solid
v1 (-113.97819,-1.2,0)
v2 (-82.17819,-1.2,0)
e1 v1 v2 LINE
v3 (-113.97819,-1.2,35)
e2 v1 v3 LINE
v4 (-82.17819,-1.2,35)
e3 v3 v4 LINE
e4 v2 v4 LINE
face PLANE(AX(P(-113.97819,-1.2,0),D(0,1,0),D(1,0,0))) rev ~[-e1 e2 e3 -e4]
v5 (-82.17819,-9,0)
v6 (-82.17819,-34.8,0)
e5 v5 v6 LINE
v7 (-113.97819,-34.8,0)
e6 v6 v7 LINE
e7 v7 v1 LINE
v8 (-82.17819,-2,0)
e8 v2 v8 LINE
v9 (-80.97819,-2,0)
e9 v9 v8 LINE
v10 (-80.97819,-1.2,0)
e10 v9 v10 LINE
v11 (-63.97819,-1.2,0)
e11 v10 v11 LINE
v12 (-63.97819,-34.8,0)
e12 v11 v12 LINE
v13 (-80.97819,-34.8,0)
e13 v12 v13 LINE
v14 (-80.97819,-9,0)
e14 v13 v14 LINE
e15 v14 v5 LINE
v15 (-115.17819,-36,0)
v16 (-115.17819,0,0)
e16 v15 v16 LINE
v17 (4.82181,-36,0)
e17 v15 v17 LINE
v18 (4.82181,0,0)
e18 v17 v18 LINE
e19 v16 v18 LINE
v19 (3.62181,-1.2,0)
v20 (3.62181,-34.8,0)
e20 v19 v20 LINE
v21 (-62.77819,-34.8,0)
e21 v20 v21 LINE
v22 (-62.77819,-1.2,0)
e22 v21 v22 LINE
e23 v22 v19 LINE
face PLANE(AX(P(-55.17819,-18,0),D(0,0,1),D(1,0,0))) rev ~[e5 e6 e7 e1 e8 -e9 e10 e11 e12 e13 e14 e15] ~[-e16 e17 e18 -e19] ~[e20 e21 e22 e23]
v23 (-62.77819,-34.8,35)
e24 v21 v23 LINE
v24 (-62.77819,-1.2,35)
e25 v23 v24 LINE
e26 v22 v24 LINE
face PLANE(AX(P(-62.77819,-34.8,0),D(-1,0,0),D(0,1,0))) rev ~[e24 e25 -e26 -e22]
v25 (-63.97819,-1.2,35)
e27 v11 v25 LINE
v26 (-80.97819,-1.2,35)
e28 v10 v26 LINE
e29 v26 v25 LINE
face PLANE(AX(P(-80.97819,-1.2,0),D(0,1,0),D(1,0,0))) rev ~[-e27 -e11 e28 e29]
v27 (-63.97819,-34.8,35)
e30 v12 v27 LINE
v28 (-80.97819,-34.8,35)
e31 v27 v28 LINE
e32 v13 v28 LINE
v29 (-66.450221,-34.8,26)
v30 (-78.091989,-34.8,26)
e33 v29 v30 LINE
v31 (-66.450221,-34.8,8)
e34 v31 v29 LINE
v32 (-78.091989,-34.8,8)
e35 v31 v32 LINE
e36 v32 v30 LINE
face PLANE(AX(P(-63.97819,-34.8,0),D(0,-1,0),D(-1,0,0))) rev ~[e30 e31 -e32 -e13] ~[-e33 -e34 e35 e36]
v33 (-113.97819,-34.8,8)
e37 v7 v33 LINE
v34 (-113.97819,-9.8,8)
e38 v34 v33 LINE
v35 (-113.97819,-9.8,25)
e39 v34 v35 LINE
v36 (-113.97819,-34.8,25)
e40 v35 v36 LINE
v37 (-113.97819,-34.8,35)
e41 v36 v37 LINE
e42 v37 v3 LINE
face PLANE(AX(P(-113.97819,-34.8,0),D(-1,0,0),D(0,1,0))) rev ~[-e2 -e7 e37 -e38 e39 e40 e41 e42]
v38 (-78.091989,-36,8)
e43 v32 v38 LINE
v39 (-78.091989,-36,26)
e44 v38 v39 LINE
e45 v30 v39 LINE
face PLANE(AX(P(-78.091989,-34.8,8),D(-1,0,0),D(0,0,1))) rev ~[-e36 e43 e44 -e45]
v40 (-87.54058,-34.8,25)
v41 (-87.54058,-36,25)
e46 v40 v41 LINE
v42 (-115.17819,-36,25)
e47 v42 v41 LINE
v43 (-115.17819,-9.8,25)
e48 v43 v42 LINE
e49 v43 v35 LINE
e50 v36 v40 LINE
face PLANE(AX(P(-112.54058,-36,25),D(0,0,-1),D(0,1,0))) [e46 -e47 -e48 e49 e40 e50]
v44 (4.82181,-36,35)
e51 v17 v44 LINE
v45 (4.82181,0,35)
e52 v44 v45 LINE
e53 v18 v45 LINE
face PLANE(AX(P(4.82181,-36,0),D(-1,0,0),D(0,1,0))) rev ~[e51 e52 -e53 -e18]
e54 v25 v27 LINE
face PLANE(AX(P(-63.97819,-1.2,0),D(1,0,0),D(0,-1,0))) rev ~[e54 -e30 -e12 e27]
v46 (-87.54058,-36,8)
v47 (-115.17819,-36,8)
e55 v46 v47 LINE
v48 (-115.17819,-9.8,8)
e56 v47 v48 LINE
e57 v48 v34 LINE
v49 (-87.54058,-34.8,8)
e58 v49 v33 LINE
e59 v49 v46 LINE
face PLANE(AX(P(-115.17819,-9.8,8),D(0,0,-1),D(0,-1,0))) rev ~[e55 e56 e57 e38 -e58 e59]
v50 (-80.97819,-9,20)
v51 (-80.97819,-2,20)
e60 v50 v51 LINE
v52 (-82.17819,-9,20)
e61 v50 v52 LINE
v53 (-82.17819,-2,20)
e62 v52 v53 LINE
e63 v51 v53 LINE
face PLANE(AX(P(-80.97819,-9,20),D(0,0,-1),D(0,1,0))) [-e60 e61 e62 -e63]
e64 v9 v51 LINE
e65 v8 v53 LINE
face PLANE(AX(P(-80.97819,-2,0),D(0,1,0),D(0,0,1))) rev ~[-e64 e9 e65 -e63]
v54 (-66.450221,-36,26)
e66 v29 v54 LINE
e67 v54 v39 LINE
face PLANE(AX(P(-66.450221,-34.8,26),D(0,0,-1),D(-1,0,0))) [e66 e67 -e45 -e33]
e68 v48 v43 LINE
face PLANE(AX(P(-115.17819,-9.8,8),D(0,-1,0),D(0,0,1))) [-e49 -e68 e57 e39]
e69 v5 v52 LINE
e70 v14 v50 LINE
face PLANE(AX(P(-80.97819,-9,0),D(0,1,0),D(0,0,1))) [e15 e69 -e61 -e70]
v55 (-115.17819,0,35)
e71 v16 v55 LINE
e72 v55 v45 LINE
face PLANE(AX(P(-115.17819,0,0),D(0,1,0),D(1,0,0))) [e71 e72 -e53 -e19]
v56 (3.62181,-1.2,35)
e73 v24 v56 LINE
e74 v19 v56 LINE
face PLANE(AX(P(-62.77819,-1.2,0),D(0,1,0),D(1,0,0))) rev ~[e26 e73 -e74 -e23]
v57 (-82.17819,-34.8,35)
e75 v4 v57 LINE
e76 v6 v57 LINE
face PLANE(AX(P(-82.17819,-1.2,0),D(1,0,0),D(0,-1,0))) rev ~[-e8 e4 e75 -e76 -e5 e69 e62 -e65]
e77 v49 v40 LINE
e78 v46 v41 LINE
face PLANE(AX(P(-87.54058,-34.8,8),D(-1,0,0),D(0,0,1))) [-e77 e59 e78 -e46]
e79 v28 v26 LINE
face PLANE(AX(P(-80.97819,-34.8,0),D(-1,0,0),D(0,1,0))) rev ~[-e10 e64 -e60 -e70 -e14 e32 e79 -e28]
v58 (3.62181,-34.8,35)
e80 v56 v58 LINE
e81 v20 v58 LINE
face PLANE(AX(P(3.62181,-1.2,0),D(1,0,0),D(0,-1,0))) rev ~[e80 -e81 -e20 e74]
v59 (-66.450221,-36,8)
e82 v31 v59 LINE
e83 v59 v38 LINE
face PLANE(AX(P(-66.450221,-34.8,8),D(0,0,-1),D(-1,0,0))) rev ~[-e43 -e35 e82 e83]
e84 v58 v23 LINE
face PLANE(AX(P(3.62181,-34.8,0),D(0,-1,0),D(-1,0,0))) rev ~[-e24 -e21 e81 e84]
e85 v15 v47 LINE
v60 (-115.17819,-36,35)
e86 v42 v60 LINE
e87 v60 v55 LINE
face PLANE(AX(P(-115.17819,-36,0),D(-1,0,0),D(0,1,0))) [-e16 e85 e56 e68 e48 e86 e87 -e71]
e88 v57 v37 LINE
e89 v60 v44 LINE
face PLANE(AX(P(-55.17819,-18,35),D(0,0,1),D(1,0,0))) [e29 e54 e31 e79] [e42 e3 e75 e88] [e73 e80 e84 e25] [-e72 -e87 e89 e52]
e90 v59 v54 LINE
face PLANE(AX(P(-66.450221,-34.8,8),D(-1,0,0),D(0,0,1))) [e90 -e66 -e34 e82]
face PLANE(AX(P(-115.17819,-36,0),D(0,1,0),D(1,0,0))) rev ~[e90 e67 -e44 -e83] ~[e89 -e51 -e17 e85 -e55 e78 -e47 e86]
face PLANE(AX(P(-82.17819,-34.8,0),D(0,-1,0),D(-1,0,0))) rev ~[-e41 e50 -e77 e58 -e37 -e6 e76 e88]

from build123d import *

# Parameters (mm, degrees)
F0_W      = 120
F0_H      = 36
F1_DEPTH  = 35
F2_W      = 7
F2_H      = 20
F3_DEPTH  = 1.2
F4_W      = 11.6417678248
F4_H      = 18
F5_DEPTH  = 1.201
F6_W      = 25
F6_H      = 17
F7_DEPTH  = 1.2
F8_W      = 1.2
F8_H      = 17
F9_DEPTH  = 3
F10_W     = 25
F10_H     = 17
F11_DEPTH = 1.2


with BuildPart() as f1:
    # F0 (on Top) → F1 (new body)
    with BuildSketch(Plane.XY):
        with Locations((-55.1781901717, -18)):
            Rectangle(F0_W, F0_H)
        Polygon((-113.9781901717, -34.8), (-113.9781901717, -1.2), (-107.9781901717, -1.2), (-89.9781901717, -1.2), (-82.1781901717, -1.2), (-80.9781901717, -1.2), (-63.9781901717, -1.2), (-62.7781901717, -1.2), (-49.0207746625, -1.2), (-45.235440135, -1.2), (3.6218098283, -1.2), (3.6218098283, -34.8), (-62.7781901717, -34.8), (-63.9781901717, -34.8), (-80.9781901717, -34.8), (-82.1781901717, -34.8), align=None, mode=Mode.SUBTRACT)
        Polygon((-82.1781901717, -26.7), (-82.1781901717, -34.8), (-80.9781901717, -34.8), (-80.9781901717, -26.6408454627), (-80.9781901717, -8.1258974969), (-80.9781901717, -1.2), (-82.1781901717, -1.2), (-82.1781901717, -8.7), align=None)
        Polygon((-63.9781901717, -26.6408454627), (-63.9781901717, -34.8), (-62.7781901717, -34.8), (-62.7781901717, -1.2), (-63.9781901717, -1.2), (-63.9781901717, -8.1258974969), align=None)
    extrude(amount=F1_DEPTH)

    # F2 (on face) → F3 (cut)
    with BuildSketch(Plane.YZ.offset(-80.9781901717)):
        with Locations((-5.5, 10)):
            Rectangle(F2_W, F2_H)
    extrude(amount=-F3_DEPTH, mode=Mode.SUBTRACT)

    # F4 (on face) → F5 (cut, through all)
    with BuildSketch(Plane(origin=(0, -34.8, 0), x_dir=(-1, 0, 0), z_dir=(0, 1, 0))):
        with Locations((72.271104902, 17)):
            Rectangle(F4_W, F4_H)
    extrude(amount=-F5_DEPTH, mode=Mode.SUBTRACT)

    # F6 (on face) → F7 (cut)
    with BuildSketch(Plane(origin=(0, -34.8, 0), x_dir=(-1, 0, 0), z_dir=(0, 1, 0))):
        with Locations((100.0405803323, 16.5)):
            Rectangle(F6_W, F6_H)
    extrude(amount=-F7_DEPTH, mode=Mode.SUBTRACT)

    # F8 (on face) → F9 (cut)
    with BuildSketch(Plane.YZ.offset(-112.5405803323)):
        with Locations((-35.4, 16.5)):
            Rectangle(F8_W, F8_H)
    extrude(amount=-F9_DEPTH, mode=Mode.SUBTRACT)

    # F10 (on face) → F11 (cut)
    with BuildSketch(Plane(origin=(-115.1781901717, 0, 0), x_dir=(0, -1, 0), z_dir=(-1, 0, 0))):
        with Locations((22.3, 16.5)):
            Rectangle(F10_W, F10_H)
    extrude(amount=-F11_DEPTH, mode=Mode.SUBTRACT)


solid = f1.part
